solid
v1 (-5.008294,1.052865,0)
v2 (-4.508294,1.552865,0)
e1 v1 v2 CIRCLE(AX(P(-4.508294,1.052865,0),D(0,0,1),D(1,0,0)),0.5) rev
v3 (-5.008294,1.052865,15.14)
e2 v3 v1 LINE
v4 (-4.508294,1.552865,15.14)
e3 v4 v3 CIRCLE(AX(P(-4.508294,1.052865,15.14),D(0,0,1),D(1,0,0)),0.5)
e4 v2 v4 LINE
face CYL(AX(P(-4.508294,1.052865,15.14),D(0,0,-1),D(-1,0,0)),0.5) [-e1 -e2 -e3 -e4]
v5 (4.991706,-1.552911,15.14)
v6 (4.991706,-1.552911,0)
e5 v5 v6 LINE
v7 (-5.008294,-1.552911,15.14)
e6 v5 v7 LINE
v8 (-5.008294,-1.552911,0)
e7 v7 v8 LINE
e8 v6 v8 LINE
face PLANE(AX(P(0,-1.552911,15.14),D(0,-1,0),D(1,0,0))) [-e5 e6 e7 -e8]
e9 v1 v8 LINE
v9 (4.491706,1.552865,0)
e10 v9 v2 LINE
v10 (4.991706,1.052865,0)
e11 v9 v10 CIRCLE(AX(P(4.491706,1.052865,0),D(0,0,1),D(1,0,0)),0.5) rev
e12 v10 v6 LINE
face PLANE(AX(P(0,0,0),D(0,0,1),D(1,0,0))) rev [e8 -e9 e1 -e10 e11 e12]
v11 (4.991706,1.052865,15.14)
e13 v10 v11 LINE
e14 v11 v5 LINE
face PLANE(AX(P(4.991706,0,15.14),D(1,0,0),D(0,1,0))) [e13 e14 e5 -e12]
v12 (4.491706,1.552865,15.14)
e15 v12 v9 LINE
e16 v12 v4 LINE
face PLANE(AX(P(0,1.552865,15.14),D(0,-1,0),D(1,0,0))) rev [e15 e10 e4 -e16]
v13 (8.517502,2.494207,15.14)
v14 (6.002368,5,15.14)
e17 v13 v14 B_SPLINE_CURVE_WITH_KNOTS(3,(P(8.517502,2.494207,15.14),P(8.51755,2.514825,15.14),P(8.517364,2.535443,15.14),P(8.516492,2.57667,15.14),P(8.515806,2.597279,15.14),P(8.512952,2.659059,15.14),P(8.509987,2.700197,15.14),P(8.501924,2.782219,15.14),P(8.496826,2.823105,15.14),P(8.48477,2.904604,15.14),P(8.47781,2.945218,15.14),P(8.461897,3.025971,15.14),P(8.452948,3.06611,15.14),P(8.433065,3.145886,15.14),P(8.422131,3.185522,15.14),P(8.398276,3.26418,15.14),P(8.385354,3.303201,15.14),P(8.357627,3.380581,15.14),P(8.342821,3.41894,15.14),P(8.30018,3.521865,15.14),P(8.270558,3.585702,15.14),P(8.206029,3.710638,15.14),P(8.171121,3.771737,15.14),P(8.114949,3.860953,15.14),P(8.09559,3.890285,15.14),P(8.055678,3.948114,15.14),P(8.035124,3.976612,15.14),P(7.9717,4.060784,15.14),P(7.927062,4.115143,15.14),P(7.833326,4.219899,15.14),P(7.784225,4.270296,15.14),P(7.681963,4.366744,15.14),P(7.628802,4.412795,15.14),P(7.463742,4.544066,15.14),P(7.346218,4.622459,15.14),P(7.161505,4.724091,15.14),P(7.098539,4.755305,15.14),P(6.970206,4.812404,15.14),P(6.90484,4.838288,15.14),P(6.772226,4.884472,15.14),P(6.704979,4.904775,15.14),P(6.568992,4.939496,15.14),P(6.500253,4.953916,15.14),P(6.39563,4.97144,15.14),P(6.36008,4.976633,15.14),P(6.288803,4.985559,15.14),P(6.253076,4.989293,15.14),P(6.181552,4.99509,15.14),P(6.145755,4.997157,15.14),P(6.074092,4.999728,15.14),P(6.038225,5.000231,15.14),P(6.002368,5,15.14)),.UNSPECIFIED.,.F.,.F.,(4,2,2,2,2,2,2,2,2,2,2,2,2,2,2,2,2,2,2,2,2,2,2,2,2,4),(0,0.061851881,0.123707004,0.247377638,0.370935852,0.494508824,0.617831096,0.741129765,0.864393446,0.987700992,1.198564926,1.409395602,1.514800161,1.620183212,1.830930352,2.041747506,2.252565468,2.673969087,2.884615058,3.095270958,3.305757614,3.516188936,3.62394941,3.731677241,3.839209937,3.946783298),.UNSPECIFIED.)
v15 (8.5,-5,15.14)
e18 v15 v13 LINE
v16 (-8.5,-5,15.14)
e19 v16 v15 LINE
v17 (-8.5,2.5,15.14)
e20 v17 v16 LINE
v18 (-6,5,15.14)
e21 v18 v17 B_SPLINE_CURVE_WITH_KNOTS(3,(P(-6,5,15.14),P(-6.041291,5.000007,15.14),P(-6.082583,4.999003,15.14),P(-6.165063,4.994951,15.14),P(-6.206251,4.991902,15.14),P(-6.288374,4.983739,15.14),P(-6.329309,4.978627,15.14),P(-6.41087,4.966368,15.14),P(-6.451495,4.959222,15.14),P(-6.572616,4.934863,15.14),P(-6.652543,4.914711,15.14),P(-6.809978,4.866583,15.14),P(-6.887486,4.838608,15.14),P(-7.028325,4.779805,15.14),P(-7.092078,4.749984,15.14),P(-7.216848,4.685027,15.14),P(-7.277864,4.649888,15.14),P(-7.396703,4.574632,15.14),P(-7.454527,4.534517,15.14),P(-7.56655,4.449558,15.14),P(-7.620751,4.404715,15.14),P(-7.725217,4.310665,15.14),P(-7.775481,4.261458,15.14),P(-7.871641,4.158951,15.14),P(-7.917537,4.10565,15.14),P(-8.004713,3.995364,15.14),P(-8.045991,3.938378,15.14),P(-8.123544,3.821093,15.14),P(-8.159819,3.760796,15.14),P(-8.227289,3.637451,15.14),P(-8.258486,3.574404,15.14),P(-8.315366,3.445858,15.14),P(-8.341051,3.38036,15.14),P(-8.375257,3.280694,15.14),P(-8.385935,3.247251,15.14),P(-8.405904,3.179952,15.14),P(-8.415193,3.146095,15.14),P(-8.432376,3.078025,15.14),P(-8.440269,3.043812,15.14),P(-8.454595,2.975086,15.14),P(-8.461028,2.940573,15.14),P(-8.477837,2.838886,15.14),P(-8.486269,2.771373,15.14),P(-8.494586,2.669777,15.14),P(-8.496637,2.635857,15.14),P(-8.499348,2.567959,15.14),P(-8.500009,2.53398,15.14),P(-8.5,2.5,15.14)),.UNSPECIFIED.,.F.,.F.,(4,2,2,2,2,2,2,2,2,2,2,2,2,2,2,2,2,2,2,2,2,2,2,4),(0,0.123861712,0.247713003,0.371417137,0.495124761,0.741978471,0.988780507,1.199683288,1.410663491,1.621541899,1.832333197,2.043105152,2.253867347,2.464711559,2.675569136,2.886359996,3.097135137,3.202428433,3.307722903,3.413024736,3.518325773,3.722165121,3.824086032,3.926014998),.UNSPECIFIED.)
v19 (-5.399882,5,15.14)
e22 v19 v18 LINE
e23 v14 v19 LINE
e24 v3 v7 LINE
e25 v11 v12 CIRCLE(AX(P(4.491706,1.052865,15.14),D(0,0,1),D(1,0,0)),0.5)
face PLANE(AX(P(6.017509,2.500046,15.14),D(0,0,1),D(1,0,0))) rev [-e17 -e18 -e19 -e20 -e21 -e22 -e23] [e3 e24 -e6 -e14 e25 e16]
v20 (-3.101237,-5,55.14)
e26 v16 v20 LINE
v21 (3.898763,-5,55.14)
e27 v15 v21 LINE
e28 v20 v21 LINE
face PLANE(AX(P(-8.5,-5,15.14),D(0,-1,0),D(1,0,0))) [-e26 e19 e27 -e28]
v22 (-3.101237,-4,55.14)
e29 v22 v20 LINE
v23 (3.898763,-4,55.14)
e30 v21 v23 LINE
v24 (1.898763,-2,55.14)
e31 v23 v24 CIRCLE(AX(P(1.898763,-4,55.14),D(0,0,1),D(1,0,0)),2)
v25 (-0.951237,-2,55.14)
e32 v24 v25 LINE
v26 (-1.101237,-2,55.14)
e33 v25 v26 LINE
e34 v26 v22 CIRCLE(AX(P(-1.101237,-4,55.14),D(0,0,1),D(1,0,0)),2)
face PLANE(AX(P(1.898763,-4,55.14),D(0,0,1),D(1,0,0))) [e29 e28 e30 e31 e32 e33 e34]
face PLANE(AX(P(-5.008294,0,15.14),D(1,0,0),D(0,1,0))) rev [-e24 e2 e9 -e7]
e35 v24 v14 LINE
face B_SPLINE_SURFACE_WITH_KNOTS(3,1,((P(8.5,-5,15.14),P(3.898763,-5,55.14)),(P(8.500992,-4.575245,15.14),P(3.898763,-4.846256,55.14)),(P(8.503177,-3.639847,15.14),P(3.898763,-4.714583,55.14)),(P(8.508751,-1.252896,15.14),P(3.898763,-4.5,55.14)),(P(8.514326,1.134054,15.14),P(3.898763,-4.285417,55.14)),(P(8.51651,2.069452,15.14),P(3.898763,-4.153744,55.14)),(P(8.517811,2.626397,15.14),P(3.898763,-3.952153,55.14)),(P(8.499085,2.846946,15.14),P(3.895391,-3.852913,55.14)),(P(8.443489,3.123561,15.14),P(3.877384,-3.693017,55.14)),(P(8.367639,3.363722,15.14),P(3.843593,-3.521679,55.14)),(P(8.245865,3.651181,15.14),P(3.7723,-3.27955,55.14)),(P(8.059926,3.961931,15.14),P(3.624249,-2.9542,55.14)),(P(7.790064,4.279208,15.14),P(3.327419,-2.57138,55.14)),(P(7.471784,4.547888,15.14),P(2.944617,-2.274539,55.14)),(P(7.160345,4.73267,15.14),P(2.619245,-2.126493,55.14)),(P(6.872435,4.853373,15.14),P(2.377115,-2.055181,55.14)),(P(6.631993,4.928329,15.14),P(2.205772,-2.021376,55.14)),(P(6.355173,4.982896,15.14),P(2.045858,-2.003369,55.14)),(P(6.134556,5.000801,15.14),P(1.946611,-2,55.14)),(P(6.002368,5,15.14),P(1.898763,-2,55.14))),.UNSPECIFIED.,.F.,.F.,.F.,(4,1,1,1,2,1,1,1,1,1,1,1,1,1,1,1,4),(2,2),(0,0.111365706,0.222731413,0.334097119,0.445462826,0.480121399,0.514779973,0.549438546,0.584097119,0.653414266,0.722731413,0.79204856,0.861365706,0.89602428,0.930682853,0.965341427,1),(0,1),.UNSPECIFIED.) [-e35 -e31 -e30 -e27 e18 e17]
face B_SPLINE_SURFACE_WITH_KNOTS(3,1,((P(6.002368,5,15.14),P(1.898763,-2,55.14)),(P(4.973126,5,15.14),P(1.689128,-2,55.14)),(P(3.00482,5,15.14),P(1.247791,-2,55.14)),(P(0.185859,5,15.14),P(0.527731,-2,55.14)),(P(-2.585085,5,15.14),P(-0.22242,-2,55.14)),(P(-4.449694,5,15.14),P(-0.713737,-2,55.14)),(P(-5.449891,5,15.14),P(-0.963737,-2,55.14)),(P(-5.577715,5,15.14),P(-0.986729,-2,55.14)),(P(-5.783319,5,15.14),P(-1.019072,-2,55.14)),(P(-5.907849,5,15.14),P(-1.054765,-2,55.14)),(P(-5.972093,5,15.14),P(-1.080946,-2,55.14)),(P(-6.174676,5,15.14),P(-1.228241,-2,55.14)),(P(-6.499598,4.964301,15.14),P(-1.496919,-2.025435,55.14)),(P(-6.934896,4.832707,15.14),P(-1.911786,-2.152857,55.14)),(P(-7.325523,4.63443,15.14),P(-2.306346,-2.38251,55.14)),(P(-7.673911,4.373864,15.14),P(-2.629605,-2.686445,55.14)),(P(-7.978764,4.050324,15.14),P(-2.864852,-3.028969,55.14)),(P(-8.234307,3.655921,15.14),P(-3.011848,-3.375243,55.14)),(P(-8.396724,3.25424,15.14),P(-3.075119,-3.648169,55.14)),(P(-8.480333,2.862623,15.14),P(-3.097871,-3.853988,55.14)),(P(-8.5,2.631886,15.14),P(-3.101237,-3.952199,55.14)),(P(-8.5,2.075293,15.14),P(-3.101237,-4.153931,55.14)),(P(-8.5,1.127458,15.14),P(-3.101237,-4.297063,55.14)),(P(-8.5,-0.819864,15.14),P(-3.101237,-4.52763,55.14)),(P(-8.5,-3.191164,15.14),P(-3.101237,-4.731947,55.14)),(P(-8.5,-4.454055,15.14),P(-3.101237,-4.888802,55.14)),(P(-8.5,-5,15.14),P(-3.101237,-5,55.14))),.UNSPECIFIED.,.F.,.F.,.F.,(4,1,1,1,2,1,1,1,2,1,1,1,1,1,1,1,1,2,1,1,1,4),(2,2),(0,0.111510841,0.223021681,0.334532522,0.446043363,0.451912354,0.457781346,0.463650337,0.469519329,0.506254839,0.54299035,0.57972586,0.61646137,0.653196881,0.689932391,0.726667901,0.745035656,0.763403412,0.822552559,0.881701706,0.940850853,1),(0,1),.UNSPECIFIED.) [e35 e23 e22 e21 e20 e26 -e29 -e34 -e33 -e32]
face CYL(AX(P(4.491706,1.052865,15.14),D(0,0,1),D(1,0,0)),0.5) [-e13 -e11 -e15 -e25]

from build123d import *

# Parameters (mm, degrees)
SKETCH1_W           = 10
SKETCH1_H           = 3.105775443
BOSS_EXTRUDE1_DEPTH = 15.14
FILLET1_R           = 0.5


with BuildPart() as part:
    # Sketch1 → Boss-Extrude1 (new body)
    with BuildSketch(Plane.XY):
        with Locations((-0.008293574, -2.2925e-05)):
            Rectangle(SKETCH1_W, SKETCH1_H)
    extrude(amount=BOSS_EXTRUDE1_DEPTH)

    # Loft1: read off the stored shape, not the designer's step
    # Loft1: loft between two sections, ruled curve by curve
    loft1_from = [
        Edge.make_bspline([(6.002368105, 5, 15.14), (4.973125798, 5, 15.14), (3.004819926, 5, 15.14), (0.185859297, 5, 15.14), (-2.58508535, 5, 15.14), (-4.44969412, 5, 15.14), (-5.449891462, 5, 15.14), (-5.57771544, 5, 15.14), (-5.783318565, 5, 15.14), (-5.907849178, 5, 15.14), (-5.972093141, 5, 15.14), (-6.17467612, 5, 15.14), (-6.499597583, 4.964301348, 15.14), (-6.934896014, 4.832707278, 15.14), (-7.32552261, 4.634429877, 15.14), (-7.673911431, 4.373864242, 15.14), (-7.978763997, 4.050324082, 15.14), (-8.234306918, 3.655920908, 15.14), (-8.396723796, 3.254240148, 15.14), (-8.480332717, 2.862623296, 15.14), (-8.5, 2.631885527, 15.14), (-8.5, 2.075292876, 15.14), (-8.5, 1.127457579, 15.14), (-8.5, -0.819864409, 15.14), (-8.5, -3.191164425, 15.14), (-8.5, -4.454054832, 15.14), (-8.5, -5, 15.14)], [0, 0, 0, 0, 0.111510841, 0.223021681, 0.334532522, 0.446043363, 0.446043363, 0.451912354, 0.457781346, 0.463650337, 0.469519329, 0.469519329, 0.506254839, 0.54299035, 0.57972586, 0.61646137, 0.653196881, 0.689932391, 0.726667901, 0.745035656, 0.763403412, 0.763403412, 0.822552559, 0.881701706, 0.940850853, 1, 1, 1, 1], 3),
        Edge.make_bspline([(8.5, -5, 15.14), (8.500991996, -4.575244993, 15.14), (8.503176578, -3.63984652, 15.14), (8.508751194, -1.252896386, 15.14), (8.51432581, 1.134053748, 15.14), (8.516510392, 2.069452221, 15.14), (8.517811111, 2.626396957, 15.14), (8.49908527, 2.846946207, 15.14), (8.443489244, 3.123561182, 15.14), (8.367638554, 3.363722111, 15.14), (8.245865367, 3.65118142, 15.14), (8.059926267, 3.961930691, 15.14), (7.790063704, 4.279208373, 15.14), (7.471784056, 4.547888472, 15.14), (7.160345054, 4.732669981, 15.14), (6.872434615, 4.853372684, 15.14), (6.631993106, 4.928329205, 15.14), (6.355173173, 4.982895557, 15.14), (6.13455577, 5.000800601, 15.14), (6.002368105, 5, 15.14)], [0, 0, 0, 0, 0.111365706, 0.222731413, 0.334097119, 0.445462826, 0.445462826, 0.480121399, 0.514779973, 0.549438546, 0.584097119, 0.653414266, 0.722731413, 0.79204856, 0.861365706, 0.89602428, 0.930682853, 0.965341427, 1, 1, 1, 1], 3),
        Edge.make_line((-8.5, -5, 15.14), (8.5, -5, 15.14)),
    ]
    loft1_to = [
        Edge.make_bspline([(1.898763427, -2, 55.14), (1.68912791, -2, 55.14), (1.247791237, -2, 55.14), (0.527731018, -2, 55.14), (-0.222420428, -2, 55.14), (-0.713736573, -2, 55.14), (-0.963736573, -2, 55.14), (-0.986728567, -2, 55.14), (-1.019071695, -2, 55.14), (-1.054765163, -2, 55.14), (-1.080945918, -2, 55.14), (-1.228240938, -2, 55.14), (-1.496918662, -2.025435314, 55.14), (-1.911785618, -2.15285696, 55.14), (-2.306346344, -2.382510015, 55.14), (-2.62960532, -2.68644458, 55.14), (-2.864851797, -3.028969372, 55.14), (-3.011847525, -3.375243405, 55.14), (-3.075118823, -3.64816943, 55.14), (-3.0978707, -3.853987875, 55.14), (-3.101236573, -3.952199478, 55.14), (-3.101236573, -4.153930631, 55.14), (-3.101236573, -4.297062563, 55.14), (-3.101236573, -4.527630405, 55.14), (-3.101236573, -4.731947482, 55.14), (-3.101236573, -4.888802183, 55.14), (-3.101236573, -5, 55.14)], [0, 0, 0, 0, 0.111510841, 0.223021681, 0.334532522, 0.446043363, 0.446043363, 0.451912354, 0.457781346, 0.463650337, 0.469519329, 0.469519329, 0.506254839, 0.54299035, 0.57972586, 0.61646137, 0.653196881, 0.689932391, 0.726667901, 0.745035656, 0.763403412, 0.763403412, 0.822552559, 0.881701706, 0.940850853, 1, 1, 1, 1], 3),
        Edge.make_bspline([(3.898763427, -5, 55.14), (3.898763427, -4.846256203, 55.14), (3.898763427, -4.714582876, 55.14), (3.898763427, -4.5, 55.14), (3.898763427, -4.285417124, 55.14), (3.898763427, -4.153743797, 55.14), (3.898763427, -3.952152769, 55.14), (3.895391319, -3.852913488, 55.14), (3.877383526, -3.693016744, 55.14), (3.843592793, -3.521678819, 55.14), (3.772300297, -3.279550251, 55.14), (3.62424883, -2.954199991, 55.14), (3.327418957, -2.571379789, 55.14), (2.944616956, -2.274539085, 55.14), (2.619245408, -2.126493121, 55.14), (2.377114625, -2.05518085, 55.14), (2.20577222, -2.021376458, 55.14), (2.045857954, -2.003369443, 55.14), (1.946610658, -2, 55.14), (1.898763427, -2, 55.14)], [0, 0, 0, 0, 0.111365706, 0.222731413, 0.334097119, 0.445462826, 0.445462826, 0.480121399, 0.514779973, 0.549438546, 0.584097119, 0.653414266, 0.722731413, 0.79204856, 0.861365706, 0.89602428, 0.930682853, 0.965341427, 1, 1, 1, 1], 3),
        Edge.make_line((-3.101236573, -5, 55.14), (3.898763427, -5, 55.14)),
    ]
    loft1 = Solid(Shell([*[Face.make_surface_from_curves(loft1_from[k], loft1_to[k]) for k in range(3)], Face(Wire(loft1_from)), Face(Wire(loft1_to))]))
    add(loft1)

    # Fillet1
    fillet1_edges = [part.edges().sort_by_distance(p)[0] for p in [
        (-5.008293574, 1.552864796, 7.57),
        (4.991706426, 1.552864796, 7.57),
    ]]
    fillet(fillet1_edges, radius=FILLET1_R)


solid = part.part
